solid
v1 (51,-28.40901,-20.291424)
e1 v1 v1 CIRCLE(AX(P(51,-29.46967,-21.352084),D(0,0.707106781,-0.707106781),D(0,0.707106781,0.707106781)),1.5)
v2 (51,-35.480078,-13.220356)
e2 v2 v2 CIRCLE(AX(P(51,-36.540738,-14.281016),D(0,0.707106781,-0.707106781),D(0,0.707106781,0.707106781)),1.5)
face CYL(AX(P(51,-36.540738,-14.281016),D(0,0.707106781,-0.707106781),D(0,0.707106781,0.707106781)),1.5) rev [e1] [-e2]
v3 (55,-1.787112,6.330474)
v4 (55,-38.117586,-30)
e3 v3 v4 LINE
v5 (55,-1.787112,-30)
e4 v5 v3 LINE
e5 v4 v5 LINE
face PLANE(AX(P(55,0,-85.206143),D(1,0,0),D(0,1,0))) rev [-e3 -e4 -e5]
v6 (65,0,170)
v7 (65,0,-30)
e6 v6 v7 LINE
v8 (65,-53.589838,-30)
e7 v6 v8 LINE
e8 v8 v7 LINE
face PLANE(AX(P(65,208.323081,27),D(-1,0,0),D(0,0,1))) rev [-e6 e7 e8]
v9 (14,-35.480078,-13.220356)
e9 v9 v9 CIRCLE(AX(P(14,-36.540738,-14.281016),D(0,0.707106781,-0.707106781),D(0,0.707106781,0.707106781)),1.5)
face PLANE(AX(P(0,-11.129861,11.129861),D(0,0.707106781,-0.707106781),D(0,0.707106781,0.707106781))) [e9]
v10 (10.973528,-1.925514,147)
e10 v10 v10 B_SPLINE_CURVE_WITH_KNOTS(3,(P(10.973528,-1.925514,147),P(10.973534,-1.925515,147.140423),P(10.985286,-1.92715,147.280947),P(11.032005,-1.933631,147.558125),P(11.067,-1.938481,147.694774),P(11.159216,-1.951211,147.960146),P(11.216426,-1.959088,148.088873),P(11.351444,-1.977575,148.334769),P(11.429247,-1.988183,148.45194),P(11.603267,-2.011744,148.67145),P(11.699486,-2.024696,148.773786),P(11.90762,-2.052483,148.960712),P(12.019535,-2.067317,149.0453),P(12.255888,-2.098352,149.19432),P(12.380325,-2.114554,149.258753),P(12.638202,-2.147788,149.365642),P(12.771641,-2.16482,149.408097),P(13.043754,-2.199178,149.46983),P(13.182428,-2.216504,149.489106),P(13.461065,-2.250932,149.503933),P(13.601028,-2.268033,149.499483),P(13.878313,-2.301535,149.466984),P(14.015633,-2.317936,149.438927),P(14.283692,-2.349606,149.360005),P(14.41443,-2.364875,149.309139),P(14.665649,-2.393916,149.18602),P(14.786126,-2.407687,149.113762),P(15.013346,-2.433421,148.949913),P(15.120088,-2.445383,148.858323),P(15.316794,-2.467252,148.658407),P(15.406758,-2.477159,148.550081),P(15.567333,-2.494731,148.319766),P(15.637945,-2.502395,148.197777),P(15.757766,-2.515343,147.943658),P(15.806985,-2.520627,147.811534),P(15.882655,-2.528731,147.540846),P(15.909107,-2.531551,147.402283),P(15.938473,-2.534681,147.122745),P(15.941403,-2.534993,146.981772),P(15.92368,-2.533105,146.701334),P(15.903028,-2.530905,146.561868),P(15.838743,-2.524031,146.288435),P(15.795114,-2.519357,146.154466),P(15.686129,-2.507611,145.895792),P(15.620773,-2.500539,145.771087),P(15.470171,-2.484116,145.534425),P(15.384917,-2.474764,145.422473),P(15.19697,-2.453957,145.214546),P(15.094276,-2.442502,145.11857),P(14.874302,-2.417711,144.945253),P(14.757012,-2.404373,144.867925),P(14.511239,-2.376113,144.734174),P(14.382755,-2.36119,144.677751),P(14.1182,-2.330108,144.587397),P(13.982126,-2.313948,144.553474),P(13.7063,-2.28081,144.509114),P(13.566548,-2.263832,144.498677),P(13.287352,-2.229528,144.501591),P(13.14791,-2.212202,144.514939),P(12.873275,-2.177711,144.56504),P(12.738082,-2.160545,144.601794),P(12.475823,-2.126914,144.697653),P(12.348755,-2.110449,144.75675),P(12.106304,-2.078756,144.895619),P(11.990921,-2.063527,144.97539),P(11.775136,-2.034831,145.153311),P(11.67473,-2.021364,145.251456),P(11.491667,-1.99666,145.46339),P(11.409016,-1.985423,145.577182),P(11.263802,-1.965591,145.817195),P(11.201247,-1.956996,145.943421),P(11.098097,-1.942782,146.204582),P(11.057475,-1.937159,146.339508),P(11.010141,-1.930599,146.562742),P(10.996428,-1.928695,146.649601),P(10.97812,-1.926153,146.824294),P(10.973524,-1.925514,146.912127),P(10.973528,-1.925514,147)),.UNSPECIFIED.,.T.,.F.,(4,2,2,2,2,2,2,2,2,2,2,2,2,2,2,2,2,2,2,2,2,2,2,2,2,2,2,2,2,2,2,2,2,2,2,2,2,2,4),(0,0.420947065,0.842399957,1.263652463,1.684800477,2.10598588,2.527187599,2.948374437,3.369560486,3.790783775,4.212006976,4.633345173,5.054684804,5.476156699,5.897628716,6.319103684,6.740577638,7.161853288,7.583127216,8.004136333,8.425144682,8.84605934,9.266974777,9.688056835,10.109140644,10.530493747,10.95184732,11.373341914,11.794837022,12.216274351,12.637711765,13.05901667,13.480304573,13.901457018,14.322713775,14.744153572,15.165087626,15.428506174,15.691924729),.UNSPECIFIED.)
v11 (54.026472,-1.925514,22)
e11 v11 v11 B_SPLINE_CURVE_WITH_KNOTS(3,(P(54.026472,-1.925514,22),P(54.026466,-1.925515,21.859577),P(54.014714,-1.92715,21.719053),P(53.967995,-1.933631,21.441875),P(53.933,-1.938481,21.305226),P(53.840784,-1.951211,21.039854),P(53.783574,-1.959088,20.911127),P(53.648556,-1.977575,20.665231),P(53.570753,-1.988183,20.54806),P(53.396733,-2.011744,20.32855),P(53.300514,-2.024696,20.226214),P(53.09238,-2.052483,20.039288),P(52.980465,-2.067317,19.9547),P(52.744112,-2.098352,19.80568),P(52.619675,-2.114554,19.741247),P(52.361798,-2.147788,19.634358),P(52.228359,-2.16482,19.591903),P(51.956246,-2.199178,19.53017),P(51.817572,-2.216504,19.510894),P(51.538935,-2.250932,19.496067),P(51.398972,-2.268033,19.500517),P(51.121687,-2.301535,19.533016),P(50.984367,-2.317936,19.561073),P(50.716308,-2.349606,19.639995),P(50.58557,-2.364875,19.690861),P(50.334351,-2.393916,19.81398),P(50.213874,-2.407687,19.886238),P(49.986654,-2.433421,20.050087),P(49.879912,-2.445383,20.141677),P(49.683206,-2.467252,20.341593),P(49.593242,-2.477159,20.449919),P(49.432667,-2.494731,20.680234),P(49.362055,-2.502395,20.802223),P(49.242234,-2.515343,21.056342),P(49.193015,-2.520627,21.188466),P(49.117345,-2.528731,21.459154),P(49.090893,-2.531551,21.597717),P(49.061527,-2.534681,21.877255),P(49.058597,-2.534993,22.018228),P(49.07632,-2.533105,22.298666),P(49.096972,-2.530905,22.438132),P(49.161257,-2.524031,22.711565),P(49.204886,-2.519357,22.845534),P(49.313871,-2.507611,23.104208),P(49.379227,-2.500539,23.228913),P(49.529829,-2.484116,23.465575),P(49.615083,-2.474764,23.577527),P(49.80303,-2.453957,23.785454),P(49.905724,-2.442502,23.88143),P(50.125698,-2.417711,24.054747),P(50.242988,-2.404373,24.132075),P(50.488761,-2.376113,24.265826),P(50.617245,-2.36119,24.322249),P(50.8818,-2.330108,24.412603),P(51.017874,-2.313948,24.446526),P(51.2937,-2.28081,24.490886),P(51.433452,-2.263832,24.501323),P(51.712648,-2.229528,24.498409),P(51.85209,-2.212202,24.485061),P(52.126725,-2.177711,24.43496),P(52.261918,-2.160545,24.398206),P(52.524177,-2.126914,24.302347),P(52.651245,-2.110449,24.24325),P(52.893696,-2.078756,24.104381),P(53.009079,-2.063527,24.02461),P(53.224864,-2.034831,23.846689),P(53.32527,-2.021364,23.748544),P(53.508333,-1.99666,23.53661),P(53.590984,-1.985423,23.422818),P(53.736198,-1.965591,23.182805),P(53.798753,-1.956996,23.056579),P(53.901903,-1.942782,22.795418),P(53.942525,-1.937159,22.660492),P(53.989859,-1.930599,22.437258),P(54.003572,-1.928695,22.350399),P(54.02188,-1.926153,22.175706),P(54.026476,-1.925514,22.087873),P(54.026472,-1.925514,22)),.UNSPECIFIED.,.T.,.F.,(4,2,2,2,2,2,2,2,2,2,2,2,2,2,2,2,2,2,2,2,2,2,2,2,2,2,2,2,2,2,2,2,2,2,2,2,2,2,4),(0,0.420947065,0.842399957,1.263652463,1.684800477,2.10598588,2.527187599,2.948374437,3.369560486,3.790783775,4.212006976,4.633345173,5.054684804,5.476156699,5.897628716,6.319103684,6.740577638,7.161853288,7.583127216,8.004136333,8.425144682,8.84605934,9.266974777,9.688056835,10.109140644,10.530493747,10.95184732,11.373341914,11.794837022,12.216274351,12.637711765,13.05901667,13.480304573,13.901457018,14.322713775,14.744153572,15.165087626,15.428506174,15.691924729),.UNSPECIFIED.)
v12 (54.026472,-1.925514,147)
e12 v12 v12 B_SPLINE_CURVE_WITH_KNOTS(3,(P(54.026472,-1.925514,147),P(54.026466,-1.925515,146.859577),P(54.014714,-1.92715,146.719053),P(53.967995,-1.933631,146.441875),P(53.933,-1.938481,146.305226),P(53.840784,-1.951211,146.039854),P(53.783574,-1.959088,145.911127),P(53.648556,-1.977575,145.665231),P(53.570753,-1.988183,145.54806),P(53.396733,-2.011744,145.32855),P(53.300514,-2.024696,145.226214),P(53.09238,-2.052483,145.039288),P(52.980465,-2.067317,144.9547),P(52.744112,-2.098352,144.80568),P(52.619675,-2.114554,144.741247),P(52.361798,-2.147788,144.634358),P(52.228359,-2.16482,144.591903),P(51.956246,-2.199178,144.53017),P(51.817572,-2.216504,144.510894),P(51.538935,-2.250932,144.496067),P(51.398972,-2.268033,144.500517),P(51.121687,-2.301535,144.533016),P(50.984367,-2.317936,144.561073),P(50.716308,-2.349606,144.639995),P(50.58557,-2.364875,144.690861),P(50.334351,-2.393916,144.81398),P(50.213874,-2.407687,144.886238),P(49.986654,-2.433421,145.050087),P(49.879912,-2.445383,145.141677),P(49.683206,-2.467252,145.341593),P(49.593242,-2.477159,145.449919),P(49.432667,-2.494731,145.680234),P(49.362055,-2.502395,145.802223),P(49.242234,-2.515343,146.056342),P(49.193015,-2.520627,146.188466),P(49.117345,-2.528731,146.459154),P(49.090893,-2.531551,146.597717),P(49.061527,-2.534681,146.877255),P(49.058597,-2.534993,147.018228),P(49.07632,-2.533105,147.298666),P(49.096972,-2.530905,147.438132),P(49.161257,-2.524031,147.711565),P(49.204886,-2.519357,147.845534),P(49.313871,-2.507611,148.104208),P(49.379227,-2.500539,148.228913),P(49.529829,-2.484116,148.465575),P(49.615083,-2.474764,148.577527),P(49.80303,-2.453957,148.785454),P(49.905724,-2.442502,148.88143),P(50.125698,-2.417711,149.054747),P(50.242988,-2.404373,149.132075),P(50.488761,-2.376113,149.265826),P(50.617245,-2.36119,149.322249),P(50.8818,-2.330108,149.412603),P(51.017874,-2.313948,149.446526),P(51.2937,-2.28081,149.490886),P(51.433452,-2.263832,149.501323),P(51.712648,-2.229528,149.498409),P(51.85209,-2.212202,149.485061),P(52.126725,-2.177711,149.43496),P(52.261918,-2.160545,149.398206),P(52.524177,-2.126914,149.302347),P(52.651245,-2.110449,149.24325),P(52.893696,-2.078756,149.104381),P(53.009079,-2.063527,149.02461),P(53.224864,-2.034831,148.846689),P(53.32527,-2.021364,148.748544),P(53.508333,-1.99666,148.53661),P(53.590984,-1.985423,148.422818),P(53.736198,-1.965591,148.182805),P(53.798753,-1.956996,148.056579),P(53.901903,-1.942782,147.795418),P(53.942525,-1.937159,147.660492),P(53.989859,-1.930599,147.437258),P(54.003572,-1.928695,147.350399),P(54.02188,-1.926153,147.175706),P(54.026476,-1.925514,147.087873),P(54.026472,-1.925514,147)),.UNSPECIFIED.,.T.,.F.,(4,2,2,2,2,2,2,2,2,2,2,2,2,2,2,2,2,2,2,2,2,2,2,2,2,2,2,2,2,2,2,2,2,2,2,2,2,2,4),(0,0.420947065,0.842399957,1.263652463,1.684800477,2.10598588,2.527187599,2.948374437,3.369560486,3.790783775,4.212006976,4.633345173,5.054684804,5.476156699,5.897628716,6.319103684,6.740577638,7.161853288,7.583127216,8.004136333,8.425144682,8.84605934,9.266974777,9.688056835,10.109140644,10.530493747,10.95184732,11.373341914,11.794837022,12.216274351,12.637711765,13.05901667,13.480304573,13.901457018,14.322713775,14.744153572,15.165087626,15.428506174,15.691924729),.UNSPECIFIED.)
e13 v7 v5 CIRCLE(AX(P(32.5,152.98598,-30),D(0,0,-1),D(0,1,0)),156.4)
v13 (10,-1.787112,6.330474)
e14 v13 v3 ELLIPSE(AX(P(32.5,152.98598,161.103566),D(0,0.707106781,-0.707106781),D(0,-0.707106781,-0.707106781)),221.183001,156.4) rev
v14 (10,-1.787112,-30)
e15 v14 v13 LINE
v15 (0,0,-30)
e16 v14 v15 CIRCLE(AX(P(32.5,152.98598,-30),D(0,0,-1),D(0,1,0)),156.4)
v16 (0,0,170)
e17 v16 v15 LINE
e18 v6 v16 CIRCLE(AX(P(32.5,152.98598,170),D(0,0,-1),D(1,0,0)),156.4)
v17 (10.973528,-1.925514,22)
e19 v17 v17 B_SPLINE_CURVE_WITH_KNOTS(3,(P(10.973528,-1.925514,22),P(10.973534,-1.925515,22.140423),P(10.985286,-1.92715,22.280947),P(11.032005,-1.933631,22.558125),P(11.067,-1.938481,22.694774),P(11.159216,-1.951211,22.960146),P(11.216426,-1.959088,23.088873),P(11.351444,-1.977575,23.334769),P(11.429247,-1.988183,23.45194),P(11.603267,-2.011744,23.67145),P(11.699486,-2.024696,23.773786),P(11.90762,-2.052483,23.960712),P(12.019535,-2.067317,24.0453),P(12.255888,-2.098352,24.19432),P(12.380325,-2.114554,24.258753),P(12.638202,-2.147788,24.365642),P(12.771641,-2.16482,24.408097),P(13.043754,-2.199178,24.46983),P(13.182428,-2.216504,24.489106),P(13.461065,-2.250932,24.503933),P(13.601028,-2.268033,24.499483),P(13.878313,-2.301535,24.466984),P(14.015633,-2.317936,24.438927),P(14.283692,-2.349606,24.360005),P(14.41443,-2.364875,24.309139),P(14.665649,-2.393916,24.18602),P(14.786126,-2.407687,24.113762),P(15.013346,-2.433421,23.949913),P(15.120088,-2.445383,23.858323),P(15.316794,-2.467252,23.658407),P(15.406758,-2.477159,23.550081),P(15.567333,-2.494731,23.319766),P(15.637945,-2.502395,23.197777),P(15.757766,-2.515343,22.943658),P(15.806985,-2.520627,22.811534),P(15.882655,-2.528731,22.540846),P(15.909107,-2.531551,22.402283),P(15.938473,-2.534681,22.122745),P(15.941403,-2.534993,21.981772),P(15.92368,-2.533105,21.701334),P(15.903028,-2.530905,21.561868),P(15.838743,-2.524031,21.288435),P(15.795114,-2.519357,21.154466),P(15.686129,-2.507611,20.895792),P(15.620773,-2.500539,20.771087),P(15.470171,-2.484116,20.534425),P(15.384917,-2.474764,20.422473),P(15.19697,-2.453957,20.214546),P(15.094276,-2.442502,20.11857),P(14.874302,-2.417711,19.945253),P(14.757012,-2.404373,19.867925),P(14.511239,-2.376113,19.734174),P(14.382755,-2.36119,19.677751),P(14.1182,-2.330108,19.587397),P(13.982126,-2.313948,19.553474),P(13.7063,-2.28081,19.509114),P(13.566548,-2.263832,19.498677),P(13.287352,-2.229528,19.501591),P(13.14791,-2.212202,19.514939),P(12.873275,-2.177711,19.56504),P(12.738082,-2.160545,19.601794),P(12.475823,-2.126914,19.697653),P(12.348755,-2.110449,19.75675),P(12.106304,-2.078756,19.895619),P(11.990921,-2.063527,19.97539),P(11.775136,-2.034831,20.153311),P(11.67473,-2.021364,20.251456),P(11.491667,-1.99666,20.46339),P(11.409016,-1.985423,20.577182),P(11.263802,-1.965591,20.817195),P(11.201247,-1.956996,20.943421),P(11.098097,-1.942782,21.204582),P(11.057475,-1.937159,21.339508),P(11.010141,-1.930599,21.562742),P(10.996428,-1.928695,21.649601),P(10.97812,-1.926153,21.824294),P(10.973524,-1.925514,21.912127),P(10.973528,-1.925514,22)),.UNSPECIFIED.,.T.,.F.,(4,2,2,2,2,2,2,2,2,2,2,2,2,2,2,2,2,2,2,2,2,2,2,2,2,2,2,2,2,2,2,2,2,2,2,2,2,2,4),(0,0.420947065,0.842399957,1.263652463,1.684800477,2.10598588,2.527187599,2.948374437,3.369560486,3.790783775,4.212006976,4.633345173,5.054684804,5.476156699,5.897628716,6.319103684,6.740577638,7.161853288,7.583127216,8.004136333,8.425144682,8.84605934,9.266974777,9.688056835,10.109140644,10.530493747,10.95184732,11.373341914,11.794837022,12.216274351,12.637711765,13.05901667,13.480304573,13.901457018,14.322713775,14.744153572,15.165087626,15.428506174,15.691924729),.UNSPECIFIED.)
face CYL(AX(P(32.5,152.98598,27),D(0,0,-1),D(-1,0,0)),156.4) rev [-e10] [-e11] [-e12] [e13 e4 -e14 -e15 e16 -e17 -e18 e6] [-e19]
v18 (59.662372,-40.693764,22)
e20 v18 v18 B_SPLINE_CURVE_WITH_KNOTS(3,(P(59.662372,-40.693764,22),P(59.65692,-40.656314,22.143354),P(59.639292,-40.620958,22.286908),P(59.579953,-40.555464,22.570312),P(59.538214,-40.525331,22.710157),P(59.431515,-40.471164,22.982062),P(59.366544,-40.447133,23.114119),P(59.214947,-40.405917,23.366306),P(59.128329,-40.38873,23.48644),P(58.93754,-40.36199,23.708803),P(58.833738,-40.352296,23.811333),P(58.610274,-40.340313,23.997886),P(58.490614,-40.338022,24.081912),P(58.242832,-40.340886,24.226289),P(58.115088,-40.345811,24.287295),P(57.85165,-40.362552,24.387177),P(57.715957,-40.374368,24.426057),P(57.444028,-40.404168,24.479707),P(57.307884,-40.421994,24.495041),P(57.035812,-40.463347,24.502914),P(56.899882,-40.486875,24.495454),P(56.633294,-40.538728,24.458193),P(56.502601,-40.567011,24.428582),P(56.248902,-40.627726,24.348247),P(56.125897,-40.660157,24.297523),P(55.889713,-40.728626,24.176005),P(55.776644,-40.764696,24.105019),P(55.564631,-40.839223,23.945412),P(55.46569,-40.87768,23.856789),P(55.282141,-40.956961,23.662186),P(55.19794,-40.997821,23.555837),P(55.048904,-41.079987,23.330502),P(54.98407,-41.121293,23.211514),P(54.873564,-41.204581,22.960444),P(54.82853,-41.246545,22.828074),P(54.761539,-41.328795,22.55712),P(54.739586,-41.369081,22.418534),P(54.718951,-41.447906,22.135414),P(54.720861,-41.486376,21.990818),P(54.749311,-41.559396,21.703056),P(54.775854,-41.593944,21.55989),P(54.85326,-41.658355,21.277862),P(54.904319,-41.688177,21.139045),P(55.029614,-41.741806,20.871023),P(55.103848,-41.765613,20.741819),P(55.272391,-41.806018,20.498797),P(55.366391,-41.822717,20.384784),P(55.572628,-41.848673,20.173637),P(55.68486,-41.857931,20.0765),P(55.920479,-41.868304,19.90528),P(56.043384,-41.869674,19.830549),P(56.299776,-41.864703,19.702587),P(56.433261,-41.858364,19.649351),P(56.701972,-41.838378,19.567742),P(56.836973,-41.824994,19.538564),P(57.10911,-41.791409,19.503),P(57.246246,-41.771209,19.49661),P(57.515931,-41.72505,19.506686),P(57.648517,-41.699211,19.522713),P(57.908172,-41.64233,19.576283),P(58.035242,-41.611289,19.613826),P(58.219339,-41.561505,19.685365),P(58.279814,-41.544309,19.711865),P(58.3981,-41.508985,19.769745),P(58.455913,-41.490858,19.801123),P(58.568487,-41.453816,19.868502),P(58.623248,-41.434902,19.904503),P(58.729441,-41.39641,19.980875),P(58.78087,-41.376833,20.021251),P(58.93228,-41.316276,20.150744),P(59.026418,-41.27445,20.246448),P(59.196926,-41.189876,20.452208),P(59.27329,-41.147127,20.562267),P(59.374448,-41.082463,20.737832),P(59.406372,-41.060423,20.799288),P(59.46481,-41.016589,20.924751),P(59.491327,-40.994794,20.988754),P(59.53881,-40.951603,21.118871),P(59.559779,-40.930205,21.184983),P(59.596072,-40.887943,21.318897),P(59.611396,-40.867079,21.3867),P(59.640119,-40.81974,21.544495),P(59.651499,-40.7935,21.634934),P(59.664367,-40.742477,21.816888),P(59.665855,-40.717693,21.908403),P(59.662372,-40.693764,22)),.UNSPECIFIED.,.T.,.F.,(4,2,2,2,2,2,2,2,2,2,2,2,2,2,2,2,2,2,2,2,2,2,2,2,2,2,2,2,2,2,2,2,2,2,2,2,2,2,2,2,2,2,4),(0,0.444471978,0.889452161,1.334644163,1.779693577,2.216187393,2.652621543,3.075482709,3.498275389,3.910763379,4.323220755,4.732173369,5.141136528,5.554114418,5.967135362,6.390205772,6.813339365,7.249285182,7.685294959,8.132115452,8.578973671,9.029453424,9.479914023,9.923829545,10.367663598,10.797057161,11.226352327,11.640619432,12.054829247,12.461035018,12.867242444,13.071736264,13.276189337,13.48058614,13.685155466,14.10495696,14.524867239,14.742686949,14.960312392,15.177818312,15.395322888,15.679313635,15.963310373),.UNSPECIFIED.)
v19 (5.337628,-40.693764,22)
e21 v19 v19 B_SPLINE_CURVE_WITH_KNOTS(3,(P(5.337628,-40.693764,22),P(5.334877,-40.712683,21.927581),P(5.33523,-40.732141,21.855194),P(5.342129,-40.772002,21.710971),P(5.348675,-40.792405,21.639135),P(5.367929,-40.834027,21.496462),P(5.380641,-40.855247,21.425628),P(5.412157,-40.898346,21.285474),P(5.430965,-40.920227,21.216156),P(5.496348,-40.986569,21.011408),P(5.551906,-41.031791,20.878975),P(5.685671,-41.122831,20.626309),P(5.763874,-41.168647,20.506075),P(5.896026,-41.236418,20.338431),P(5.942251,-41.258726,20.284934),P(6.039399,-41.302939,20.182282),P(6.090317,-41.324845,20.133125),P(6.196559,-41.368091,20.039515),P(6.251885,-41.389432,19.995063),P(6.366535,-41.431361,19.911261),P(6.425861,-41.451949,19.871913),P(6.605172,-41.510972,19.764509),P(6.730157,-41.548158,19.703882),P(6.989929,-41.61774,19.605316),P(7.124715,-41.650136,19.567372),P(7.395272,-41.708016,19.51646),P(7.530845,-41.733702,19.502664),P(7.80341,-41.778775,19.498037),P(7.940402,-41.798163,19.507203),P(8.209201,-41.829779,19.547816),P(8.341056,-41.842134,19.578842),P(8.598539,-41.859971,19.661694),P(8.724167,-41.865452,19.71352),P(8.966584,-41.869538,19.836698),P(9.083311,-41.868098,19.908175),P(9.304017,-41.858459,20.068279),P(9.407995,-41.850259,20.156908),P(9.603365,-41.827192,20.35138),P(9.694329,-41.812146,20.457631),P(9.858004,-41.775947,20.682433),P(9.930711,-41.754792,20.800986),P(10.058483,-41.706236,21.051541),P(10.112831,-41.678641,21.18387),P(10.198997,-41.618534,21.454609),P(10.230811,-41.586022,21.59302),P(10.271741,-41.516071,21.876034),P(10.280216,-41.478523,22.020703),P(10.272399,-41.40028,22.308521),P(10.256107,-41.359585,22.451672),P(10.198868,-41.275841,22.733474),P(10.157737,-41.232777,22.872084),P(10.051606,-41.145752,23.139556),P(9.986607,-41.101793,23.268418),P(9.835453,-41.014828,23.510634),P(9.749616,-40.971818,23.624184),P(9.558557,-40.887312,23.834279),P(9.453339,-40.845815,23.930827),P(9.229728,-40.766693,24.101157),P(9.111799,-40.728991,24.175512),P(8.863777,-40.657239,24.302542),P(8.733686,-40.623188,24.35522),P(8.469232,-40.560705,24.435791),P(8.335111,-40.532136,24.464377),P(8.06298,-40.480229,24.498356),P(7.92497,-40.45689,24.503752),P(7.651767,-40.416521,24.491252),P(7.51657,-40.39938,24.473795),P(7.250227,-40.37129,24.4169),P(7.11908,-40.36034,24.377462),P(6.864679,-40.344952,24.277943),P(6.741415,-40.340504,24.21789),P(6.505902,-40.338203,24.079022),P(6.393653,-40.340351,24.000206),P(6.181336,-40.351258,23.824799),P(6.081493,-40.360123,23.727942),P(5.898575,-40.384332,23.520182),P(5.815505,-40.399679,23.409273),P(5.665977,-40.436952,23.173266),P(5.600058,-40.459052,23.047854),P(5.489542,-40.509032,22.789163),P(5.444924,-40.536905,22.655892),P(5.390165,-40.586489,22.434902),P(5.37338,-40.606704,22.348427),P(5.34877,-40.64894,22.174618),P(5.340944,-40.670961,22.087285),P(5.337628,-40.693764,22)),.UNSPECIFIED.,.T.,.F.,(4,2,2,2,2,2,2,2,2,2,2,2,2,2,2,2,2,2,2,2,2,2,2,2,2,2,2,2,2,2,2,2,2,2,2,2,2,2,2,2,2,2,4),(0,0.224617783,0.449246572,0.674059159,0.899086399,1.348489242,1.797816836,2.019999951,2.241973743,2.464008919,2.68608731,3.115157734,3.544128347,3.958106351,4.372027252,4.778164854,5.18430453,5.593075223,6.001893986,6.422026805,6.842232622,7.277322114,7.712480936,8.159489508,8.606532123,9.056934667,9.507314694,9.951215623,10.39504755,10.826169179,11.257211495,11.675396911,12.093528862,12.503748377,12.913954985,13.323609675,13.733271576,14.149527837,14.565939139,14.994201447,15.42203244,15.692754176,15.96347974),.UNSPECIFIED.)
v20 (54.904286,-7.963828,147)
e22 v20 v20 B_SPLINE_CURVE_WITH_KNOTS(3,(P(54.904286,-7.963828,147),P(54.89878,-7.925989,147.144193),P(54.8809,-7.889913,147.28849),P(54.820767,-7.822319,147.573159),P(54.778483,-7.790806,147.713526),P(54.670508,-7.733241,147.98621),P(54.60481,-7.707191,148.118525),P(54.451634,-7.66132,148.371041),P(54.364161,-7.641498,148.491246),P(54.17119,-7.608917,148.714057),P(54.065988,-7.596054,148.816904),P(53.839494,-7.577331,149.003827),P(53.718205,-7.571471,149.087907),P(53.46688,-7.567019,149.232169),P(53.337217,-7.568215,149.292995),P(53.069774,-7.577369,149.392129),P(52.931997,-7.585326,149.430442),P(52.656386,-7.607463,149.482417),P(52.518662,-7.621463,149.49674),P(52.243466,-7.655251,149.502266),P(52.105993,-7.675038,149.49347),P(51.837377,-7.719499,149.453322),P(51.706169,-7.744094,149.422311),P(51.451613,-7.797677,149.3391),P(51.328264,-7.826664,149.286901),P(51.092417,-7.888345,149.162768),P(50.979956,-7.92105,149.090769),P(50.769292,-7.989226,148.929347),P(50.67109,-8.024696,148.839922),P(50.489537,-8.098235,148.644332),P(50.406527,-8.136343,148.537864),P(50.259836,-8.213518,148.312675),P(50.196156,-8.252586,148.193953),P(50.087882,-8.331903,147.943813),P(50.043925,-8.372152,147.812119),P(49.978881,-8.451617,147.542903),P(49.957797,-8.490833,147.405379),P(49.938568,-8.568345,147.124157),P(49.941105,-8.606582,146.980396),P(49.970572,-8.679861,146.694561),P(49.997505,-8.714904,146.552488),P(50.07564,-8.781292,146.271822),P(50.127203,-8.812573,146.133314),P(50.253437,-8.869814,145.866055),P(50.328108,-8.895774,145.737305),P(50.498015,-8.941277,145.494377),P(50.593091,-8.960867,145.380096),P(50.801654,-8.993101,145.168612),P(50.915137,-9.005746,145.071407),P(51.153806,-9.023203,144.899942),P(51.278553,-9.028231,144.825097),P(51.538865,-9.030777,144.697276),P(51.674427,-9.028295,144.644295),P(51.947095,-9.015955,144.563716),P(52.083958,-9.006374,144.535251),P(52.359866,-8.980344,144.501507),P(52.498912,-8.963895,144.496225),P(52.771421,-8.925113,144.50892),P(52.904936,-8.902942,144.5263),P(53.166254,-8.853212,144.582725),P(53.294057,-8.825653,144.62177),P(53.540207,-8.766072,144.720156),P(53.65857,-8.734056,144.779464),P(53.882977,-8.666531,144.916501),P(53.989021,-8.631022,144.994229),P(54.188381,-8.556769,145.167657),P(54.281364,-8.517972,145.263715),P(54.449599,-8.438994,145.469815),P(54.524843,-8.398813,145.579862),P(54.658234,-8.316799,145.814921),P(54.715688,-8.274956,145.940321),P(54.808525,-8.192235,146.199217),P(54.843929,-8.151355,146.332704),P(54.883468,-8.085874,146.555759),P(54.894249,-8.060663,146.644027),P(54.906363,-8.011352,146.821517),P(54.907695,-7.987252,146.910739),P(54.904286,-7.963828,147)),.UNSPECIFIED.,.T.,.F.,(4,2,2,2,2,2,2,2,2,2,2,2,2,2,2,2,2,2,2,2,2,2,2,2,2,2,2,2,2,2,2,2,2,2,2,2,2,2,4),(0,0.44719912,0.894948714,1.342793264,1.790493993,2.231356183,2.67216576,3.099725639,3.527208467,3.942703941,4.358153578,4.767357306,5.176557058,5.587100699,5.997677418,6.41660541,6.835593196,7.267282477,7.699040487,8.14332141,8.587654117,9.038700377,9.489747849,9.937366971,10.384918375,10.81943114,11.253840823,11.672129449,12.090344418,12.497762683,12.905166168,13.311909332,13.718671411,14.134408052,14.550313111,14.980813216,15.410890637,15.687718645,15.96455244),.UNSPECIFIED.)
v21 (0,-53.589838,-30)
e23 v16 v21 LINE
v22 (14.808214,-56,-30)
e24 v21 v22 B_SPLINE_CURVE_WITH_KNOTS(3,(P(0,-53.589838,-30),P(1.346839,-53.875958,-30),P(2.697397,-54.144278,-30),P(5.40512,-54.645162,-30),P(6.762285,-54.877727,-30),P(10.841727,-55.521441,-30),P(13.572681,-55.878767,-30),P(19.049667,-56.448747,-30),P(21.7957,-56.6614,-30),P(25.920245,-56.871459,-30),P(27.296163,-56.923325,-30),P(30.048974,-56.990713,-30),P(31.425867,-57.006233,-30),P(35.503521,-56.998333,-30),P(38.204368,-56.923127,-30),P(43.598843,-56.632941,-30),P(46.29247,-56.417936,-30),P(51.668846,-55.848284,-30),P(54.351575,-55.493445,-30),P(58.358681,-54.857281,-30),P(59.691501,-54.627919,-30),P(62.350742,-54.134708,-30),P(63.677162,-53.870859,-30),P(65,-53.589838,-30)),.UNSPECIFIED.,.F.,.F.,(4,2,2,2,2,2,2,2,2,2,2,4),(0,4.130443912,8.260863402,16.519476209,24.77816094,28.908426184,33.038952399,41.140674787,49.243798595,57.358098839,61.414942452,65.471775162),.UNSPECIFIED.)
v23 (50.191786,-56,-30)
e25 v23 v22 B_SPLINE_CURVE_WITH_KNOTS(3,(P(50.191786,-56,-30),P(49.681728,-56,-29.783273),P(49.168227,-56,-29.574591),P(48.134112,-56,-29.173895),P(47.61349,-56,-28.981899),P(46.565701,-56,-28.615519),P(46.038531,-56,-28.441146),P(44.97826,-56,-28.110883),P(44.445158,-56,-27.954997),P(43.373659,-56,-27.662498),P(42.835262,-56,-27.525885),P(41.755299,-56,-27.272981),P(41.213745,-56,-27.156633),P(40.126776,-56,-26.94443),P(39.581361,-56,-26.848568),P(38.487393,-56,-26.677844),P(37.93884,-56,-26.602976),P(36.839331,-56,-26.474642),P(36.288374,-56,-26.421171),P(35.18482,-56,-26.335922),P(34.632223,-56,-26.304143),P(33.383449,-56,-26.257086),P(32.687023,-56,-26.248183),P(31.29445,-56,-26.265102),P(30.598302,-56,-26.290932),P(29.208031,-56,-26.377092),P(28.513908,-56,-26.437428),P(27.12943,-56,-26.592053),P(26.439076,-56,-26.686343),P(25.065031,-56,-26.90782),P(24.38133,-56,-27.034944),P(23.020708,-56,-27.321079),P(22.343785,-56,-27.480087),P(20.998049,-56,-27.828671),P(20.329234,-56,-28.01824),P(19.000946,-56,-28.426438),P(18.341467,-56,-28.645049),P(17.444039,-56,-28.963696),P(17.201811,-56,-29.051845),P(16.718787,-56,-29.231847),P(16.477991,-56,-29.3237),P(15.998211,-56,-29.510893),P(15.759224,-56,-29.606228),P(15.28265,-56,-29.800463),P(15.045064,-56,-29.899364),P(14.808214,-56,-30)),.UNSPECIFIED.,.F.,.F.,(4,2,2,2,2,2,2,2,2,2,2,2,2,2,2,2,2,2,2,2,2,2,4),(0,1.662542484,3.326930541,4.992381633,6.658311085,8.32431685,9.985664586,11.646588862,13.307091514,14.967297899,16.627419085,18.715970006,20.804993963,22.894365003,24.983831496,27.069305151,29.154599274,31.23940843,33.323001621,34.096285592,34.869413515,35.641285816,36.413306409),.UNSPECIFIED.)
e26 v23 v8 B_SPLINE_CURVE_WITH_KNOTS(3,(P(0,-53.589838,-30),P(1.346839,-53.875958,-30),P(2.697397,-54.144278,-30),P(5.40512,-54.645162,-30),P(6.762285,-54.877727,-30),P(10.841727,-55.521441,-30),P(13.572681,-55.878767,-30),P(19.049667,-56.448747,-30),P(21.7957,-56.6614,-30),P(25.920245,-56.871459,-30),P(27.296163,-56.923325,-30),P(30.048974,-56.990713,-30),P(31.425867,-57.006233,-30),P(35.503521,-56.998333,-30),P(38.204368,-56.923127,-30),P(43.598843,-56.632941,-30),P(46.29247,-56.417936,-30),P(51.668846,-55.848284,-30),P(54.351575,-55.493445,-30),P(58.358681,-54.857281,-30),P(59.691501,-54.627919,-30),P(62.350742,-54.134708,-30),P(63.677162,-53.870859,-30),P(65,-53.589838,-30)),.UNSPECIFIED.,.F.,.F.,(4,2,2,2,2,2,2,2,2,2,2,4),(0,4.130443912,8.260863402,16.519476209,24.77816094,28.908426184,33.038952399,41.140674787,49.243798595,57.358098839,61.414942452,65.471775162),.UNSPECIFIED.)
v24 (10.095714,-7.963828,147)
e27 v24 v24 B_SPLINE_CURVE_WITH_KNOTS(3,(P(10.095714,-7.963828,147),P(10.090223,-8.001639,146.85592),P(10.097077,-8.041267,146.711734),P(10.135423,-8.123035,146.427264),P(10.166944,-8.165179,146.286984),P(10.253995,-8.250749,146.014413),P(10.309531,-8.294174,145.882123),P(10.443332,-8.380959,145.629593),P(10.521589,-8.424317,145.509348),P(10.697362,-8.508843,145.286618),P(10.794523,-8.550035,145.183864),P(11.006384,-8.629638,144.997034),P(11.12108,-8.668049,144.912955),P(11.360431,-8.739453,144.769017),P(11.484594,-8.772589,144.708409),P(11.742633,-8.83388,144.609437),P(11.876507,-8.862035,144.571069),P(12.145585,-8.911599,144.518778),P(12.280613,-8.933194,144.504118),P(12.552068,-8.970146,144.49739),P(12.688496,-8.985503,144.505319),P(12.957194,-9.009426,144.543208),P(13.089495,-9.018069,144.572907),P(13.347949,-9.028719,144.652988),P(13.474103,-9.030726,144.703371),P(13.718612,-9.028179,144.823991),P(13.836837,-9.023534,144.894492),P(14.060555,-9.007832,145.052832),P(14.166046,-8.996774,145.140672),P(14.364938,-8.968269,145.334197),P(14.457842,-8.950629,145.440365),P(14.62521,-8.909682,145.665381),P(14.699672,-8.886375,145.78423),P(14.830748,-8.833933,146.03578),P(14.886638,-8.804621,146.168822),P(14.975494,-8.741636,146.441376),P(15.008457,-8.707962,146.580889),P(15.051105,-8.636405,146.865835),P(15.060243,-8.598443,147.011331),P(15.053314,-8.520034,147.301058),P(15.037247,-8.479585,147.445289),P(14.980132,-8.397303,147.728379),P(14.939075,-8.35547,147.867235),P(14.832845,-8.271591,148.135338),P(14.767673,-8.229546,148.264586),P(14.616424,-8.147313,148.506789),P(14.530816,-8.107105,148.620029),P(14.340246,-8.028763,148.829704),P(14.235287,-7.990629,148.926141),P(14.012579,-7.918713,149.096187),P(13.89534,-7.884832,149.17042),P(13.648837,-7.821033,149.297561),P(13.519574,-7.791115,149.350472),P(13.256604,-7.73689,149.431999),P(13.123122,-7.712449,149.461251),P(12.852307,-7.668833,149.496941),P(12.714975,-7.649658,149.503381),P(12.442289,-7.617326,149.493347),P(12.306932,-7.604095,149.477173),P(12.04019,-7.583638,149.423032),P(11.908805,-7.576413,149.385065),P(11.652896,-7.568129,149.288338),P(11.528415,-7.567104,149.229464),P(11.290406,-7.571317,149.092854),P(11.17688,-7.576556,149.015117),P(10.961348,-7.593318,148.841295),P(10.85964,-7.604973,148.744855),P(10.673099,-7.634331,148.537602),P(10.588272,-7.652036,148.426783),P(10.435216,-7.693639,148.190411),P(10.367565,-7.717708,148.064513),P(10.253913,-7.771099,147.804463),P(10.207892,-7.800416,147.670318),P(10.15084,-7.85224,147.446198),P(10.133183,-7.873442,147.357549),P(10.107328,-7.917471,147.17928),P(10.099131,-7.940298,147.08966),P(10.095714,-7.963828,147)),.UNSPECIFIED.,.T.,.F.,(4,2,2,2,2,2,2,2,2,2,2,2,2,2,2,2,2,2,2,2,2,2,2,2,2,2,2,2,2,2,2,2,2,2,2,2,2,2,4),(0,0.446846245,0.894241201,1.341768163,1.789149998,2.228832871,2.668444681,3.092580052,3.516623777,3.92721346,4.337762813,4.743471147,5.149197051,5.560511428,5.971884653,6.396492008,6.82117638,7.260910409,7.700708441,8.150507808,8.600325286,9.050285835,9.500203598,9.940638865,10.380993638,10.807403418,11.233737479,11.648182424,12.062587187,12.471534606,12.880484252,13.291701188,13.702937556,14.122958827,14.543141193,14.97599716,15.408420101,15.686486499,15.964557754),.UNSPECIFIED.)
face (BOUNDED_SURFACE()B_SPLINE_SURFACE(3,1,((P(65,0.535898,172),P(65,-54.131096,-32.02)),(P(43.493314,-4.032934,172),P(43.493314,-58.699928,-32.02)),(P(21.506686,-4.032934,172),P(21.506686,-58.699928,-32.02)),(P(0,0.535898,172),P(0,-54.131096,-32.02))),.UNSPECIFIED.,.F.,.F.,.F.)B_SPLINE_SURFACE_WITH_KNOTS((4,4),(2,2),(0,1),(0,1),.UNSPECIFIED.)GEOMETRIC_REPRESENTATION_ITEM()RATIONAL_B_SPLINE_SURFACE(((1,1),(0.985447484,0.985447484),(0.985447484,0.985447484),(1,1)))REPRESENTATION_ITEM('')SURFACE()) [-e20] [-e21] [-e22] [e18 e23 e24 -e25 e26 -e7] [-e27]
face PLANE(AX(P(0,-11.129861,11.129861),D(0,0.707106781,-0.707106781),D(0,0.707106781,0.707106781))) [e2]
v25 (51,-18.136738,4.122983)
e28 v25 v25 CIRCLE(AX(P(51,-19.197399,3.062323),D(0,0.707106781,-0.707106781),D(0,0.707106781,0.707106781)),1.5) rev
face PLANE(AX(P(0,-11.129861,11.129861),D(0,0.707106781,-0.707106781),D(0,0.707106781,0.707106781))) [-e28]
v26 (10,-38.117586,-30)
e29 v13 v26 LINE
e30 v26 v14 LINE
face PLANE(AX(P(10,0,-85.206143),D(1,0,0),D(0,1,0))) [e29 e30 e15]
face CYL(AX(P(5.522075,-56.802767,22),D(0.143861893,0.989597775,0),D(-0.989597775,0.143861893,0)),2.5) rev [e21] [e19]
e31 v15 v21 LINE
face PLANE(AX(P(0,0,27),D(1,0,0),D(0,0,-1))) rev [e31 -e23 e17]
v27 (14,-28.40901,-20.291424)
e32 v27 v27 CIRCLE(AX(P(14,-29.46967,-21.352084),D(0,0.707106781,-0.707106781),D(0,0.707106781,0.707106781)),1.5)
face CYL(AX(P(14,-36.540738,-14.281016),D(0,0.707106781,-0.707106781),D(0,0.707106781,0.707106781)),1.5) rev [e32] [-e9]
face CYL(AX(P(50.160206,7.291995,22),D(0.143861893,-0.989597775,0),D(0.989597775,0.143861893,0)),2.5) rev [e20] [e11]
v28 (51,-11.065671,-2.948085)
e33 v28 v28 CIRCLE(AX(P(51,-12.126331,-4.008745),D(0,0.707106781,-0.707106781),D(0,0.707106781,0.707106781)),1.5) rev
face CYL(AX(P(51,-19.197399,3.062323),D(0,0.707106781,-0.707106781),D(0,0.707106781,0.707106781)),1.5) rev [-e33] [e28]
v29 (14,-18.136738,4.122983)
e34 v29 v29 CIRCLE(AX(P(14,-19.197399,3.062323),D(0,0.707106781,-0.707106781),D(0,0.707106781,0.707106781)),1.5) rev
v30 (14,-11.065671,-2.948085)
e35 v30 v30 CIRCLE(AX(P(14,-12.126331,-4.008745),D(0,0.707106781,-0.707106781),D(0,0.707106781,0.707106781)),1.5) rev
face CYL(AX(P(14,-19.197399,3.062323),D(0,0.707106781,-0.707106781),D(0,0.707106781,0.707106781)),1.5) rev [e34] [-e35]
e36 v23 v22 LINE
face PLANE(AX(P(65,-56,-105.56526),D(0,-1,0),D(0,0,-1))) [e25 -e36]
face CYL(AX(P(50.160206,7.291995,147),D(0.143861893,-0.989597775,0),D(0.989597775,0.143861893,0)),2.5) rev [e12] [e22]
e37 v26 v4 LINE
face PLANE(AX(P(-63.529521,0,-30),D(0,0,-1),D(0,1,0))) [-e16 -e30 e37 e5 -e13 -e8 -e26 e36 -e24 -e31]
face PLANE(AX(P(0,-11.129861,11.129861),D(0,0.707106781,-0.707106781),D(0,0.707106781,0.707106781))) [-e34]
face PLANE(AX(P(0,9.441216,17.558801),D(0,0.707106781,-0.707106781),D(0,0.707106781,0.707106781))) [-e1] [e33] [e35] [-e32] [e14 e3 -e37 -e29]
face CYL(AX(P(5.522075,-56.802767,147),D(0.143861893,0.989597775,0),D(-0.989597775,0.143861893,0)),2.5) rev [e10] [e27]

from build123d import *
from build123d.topology import SkipClean

# Parameters (mm, degrees)
BOSS_EXTRUDE1_DEPTH     = 27
BOSS_EXTRUDE2_DEPTH     = 65
CUT_EXTRUDE1_DEPTH      = 91.890043459
FILLET1_R               = 1
BOSS_EXTRUDE3_REACH     = 104.243
CUT_EXTRUDE2_REACH      = 104.243
BOSS_EXTRUDE4_REACH     = 92.026
BOSS_EXTRUDE5_DEPTH     = 65
SKETCH14_R              = 1.5
CUT_EXTRUDE7_DEPTH      = 5
CUT_EXTRUDE9_DEPTH      = 105.630301538
CUT_EXTRUDE9_DEPTH_BACK = 105.630301538
SKETCH15_W              = 45
SKETCH15_H              = 5.74
SKETCH16_R              = 1.5
CUT_EXTRUDE10_DEPTH     = 10
FILLET4_R               = 23
BOSS_EXTRUDE7_REACH     = 219.626
CUT_EXTRUDE5_DEPTH      = 184.620949427
CUT_EXTRUDE5_DEPTH_BACK = 184.620949427
SKETCH11_R              = 2.5
CUT_EXTRUDE6_DEPTH      = 186.847147779
CUT_EXTRUDE6_DEPTH_BACK = 186.847147779
SKETCH12_R              = 2.5
CUT_SWEEP1_START        = -43.471641414
CUT_SWEEP1_DEPTH        = 207.679031883


# Read off the part's stored shape, not the designer's step: Cut-Sweep1
with BuildPart() as part:
    # Sketch1 → Boss-Extrude1 (new body)
    with BuildSketch(Plane.XY):
        with BuildLine():
            Line((0, 0), (0, -26))
            ThreePointArc((0, -26), (32.5, -29.41402025), (65, -26))
            Line((65, -26), (65, 0))
            ThreePointArc((65, 0), (32.5, -3.41402025), (0, 0))
        make_face()
    extrude(amount=BOSS_EXTRUDE1_DEPTH)

    # Sketch4 → Boss-Extrude2 (add)
    with BuildSketch(Plane(origin=(65, 0, 0), x_dir=(0, 0, -1), z_dir=(1, 0, 0))):
        Polygon((0, -26), (30, -56), (30, -30), (0, 0), align=None)
    extrude(amount=-BOSS_EXTRUDE2_DEPTH)

    # Sketch5 → Cut-Extrude1 (cut, through all)
    with BuildSketch(Plane.XY):
        with BuildLine():
            Line((65, 0), (0, 0))
            ThreePointArc((0, 0), (32.5, -3.41402025), (65, 0))
        make_face()
    extrude(amount=-CUT_EXTRUDE1_DEPTH, mode=Mode.SUBTRACT)

    # Fillet1
    fillet1_edges = [part.edges().sort_by_distance(p)[0] for p in [
        (32.5, -56, -30),
    ]]
    fillet(fillet1_edges, radius=FILLET1_R)

    # Boss-Extrude3: up to this face of the body (flat: up to its plane)
    boss_extrude3_end = Plane(part.part.faces().sort_by_distance((32.5, -41.792893219, -30))[0])
    # Sketch6 → Boss-Extrude3 (add, up to the picked face)
    with BuildSketch(Plane.XY.offset(27), mode=Mode.PRIVATE) as boss_extrude3_sk1:
        with BuildLine():
            ThreePointArc((0, -26), (4.985486693, -26.974767058), (10, -27.787112227))
            Line((10, -27.787112227), (10, -1.787112227))
            ThreePointArc((10, -1.787112227), (4.985486693, -0.974767058), (0, 0))
            Line((0, 0), (0, -26))
        make_face()
    boss_extrude3_tool1 = split(extrude(boss_extrude3_sk1.sketch, amount=-BOSS_EXTRUDE3_REACH, mode=Mode.PRIVATE), bisect_by=boss_extrude3_end, keep=Keep.BOTH, mode=Mode.PRIVATE)
    # Sketch6 → Boss-Extrude3 (add, up to the picked face)
    with BuildSketch(Plane.XY.offset(27), mode=Mode.PRIVATE) as boss_extrude3_sk2:
        with BuildLine():
            Line((55, -1.787112227), (55, -27.787112227))
            ThreePointArc((55, -27.787112227), (60.014513307, -26.974767058), (65, -26))
            Line((65, -26), (65, 0))
            ThreePointArc((65, 0), (60.014513307, -0.974767058), (55, -1.787112227))
        make_face()
    boss_extrude3_tool2 = split(extrude(boss_extrude3_sk2.sketch, amount=-BOSS_EXTRUDE3_REACH, mode=Mode.PRIVATE), bisect_by=boss_extrude3_end, keep=Keep.BOTH, mode=Mode.PRIVATE)
    # Sketch6 → Boss-Extrude3 (add, up to the picked face)
    with BuildSketch(Plane.XY.offset(27), mode=Mode.PRIVATE) as boss_extrude3_sk3:
        with BuildLine():
            Line((10, -54.292893219), (10, -27.787112227))
            ThreePointArc((10, -27.787112227), (4.985486693, -26.974767058), (0, -26))
            Line((0, -26), (0, -54.292893219))
            Line((0, -54.292893219), (10, -54.292893219))
        make_face()
    boss_extrude3_tool3 = split(extrude(boss_extrude3_sk3.sketch, amount=-BOSS_EXTRUDE3_REACH, mode=Mode.PRIVATE), bisect_by=boss_extrude3_end, keep=Keep.BOTH, mode=Mode.PRIVATE)
    # Sketch6 → Boss-Extrude3 (add, up to the picked face)
    with BuildSketch(Plane.XY.offset(27), mode=Mode.PRIVATE) as boss_extrude3_sk4:
        with BuildLine():
            ThreePointArc((65, -26), (60.014513307, -26.974767058), (55, -27.787112227))
            Line((55, -27.787112227), (55, -54.292893219))
            Line((55, -54.292893219), (65, -54.292893219))
            Line((65, -54.292893219), (65, -26))
        make_face()
    boss_extrude3_tool4 = split(extrude(boss_extrude3_sk4.sketch, amount=-BOSS_EXTRUDE3_REACH, mode=Mode.PRIVATE), bisect_by=boss_extrude3_end, keep=Keep.BOTH, mode=Mode.PRIVATE)
    add(boss_extrude3_tool1.solids().sort_by(Axis((5, -13.949429, 27), (0, 0, -1)))[0])
    add(boss_extrude3_tool2.solids().sort_by(Axis((60, -13.949429, 27), (0, 0, -1)))[0])
    add(boss_extrude3_tool3.solids().sort_by(Axis((4.945547, -40.616285, 27), (0, 0, -1)))[0])
    add(boss_extrude3_tool4.solids().sort_by(Axis((60.054453, -40.616285, 27), (0, 0, -1)))[0])

    # Cut-Extrude2: up to this plane
    cut_extrude2_end = Plane(origin=(-63.529520697, -13, 13), z_dir=(0, -0.7071067811865562, 0.7071067811865389))
    # Sketch7 → Cut-Extrude2 (cut, up to the surface)
    with BuildSketch(Plane.XY.offset(27), mode=Mode.PRIVATE) as cut_extrude2_sk1:
        with BuildLine():
            ThreePointArc((10, -27.787112227), (4.985486693, -26.974767058), (0, -26))
            Line((0, -26), (0, -54.292893219))
            Line((0, -54.292893219), (10, -54.292893219))
            Line((10, -54.292893219), (10, -27.787112227))
        make_face()
    cut_extrude2_tool1 = split(extrude(cut_extrude2_sk1.sketch, amount=-CUT_EXTRUDE2_REACH, mode=Mode.PRIVATE), bisect_by=cut_extrude2_end, keep=Keep.BOTH, mode=Mode.PRIVATE)
    add(cut_extrude2_tool1.solids().sort_by_distance((4.945547, -40.616285, 27))[0], mode=Mode.SUBTRACT)
    # Sketch7 → Cut-Extrude2 (cut, up to the surface)
    with BuildSketch(Plane.XY.offset(27), mode=Mode.PRIVATE) as cut_extrude2_sk2:
        with BuildLine():
            Line((65, -54.292893219), (65, -26))
            ThreePointArc((65, -26), (60.014513307, -26.974767058), (55, -27.787112227))
            Line((55, -27.787112227), (55, -54.292893219))
            Line((55, -54.292893219), (65, -54.292893219))
        make_face()
    cut_extrude2_tool2 = split(extrude(cut_extrude2_sk2.sketch, amount=-CUT_EXTRUDE2_REACH, mode=Mode.PRIVATE), bisect_by=cut_extrude2_end, keep=Keep.BOTH, mode=Mode.PRIVATE)
    add(cut_extrude2_tool2.solids().sort_by_distance((60.054453, -40.616285, 27))[0], mode=Mode.SUBTRACT)

    # Boss-Extrude4: up to this face of the body (flat: up to its plane)
    boss_extrude4_end = Plane(part.part.faces().sort_by_distance((32.5, -40.28761869, -14.28761869))[0])
    # Sketch8 → Boss-Extrude4 (add, up to the picked face)
    with BuildSketch(Plane(origin=(0, 0, 0), x_dir=(-1, 0, 0), z_dir=(0, 0, -1)), mode=Mode.PRIVATE) as boss_extrude4_sk1:
        with BuildLine():
            Line((-55, -26), (-55, -27.787112227))
            ThreePointArc((-55, -27.787112227), (-32.5, -29.41402025), (-10, -27.787112227))
            Line((-10, -27.787112227), (-10, -26))
            Line((-10, -26), (-55, -26))
        make_face()
    boss_extrude4_tool1 = split(extrude(boss_extrude4_sk1.sketch, amount=BOSS_EXTRUDE4_REACH, mode=Mode.PRIVATE), bisect_by=boss_extrude4_end, keep=Keep.BOTH, mode=Mode.PRIVATE)
    add(boss_extrude4_tool1.solids().sort_by(Axis((32.5, -27.477312, 0), (0, 0, -1)))[0])

    # Sketch9 → Boss-Extrude5 (add)
    with BuildSketch(Plane.ZY):
        Polygon((-30, -51), (-25, -51), (-30, -56), align=None)
    extrude(amount=-BOSS_EXTRUDE5_DEPTH)

    # Sketch14 → Cut-Extrude7 (cut)
    with SkipClean():  # the faces are left unmerged after this step: merging them gives an invalid solid
        with BuildSketch(Plane(origin=(0, 0, 0), x_dir=(1, 0, 0), z_dir=(0, 0.7071067811865561, -0.7071067811865389))):
            with Locations(Location((14, 35.887280306, 0), (0, 0, 270))):
                Circle(SKETCH14_R)
            with Locations(Location((51, 35.887280306, 0), (0, 0, 270))):
                Circle(SKETCH14_R)
            with Locations(Location((51, 11.367280306, 0), (0, 0, 90))):
                Circle(SKETCH14_R)
            with Locations(Location((14, 11.367280306, 0), (0, 0, 90))):
                Circle(SKETCH14_R)
        extrude(amount=-CUT_EXTRUDE7_DEPTH, mode=Mode.SUBTRACT)

    # Sketch15 → Cut-Extrude9 (cut, two sides: drawn at the far end of the back side and taken through both)
    with SkipClean():  # the faces are left unmerged after this step: merging them gives an invalid solid
        with BuildSketch(Plane(origin=(0, 13.5, 13.5), x_dir=(-1, 0, 0), z_dir=(0, -0.7071067811865389, -0.7071067811865561)).offset(-CUT_EXTRUDE9_DEPTH_BACK)):
            with Locations((-32.5, -2.87)):
                Rectangle(SKETCH15_W, SKETCH15_H)
        extrude(amount=CUT_EXTRUDE9_DEPTH + CUT_EXTRUDE9_DEPTH_BACK, mode=Mode.SUBTRACT)

    # Sketch16 → Cut-Extrude10 (cut)
    with SkipClean():  # the faces are left unmerged after this step: merging them gives an invalid solid
        with BuildSketch(Plane(origin=(0, -4.058792924, 4.058792924), x_dir=(1, 0, 0), z_dir=(0, 0.7071067811865562, -0.7071067811865389))):
            with Locations(Location((14, 35.936406871, 0), (0, 0, 270))):
                Circle(SKETCH16_R)
            with Locations(Location((51, 35.936406871, 0), (0, 0, 270))):
                Circle(SKETCH16_R)
            with Locations(Location((14, 11.409221552, 0), (0, 0, 270))):
                Circle(SKETCH16_R)
            with Locations(Location((51, 11.409221552, 0), (0, 0, 270))):
                Circle(SKETCH16_R)
        extrude(amount=-CUT_EXTRUDE10_DEPTH, mode=Mode.SUBTRACT)

    # Fillet4
    fillet4_edges = [part.edges().sort_by_distance(p)[0] for p in [
        (32.5, -29.41402025, -3.41402025),
    ]]
    fillet(fillet4_edges, radius=FILLET4_R)

    # Boss-Extrude7: up to this face of the body (flat: up to its plane)
    boss_extrude7_end = Plane(part.part.faces().sort_by_distance((32.499999985, -45.563204914, -19.563204914))[0])
    # Sketch24 → Boss-Extrude7 (add, up to the picked face)
    with BuildSketch(Plane.XY.offset(170), mode=Mode.PRIVATE) as boss_extrude7_sk1:
        with BuildLine():
            Line((65, -56), (65, 0))
            ThreePointArc((65, 0), (60.014513307, -0.974767058), (55, -1.787112227))
            ThreePointArc((55, -1.787112227), (32.5, -3.41402025), (10, -1.787112227))
            ThreePointArc((10, -1.787112227), (4.985486693, -0.974767058), (0, 0))
            Line((0, 0), (0, -56))
            Line((0, -56), (65, -56))
        make_face()
    boss_extrude7_tool1 = split(extrude(boss_extrude7_sk1.sketch, amount=-BOSS_EXTRUDE7_REACH, mode=Mode.PRIVATE), bisect_by=boss_extrude7_end, keep=Keep.BOTH, mode=Mode.PRIVATE)
    add(boss_extrude7_tool1.solids().sort_by(Axis((32.5, -29.130902, 170), (0, 0, -1)))[0])

    # Sketch11 → Cut-Extrude5 (cut, two sides: drawn at the far end of the back side and taken through both)
    with BuildSketch(Plane(origin=(5.094217018, -35.042120851, 0), x_dir=(-0.9895977747865052, -0.14386189258312035, 0), z_dir=(-0.14386189258312035, 0.9895977747865053, 0)).offset(-CUT_EXTRUDE5_DEPTH_BACK)):
        with Locations(Location((-50.687468406, 22, 0), (0, 0, 180))):
            Circle(SKETCH11_R)
        with Locations(Location((-50.687468406, 147, 0), (0, 0, 180))):
            Circle(SKETCH11_R)
    extrude(amount=CUT_EXTRUDE5_DEPTH + CUT_EXTRUDE5_DEPTH_BACK, mode=Mode.SUBTRACT)

    # Sketch12 → Cut-Extrude6 (cut, two sides: drawn at the far end of the back side and taken through both)
    with BuildSketch(Plane(origin=(-3.74896115, -25.788369281, 0), x_dir=(0.9895977747865055, -0.14386189258311885, 0), z_dir=(-0.14386189258311885, -0.9895977747865056, 0)).offset(-CUT_EXTRUDE6_DEPTH_BACK)):
        with Locations(Location((13.636386955, 22, 0), (0, 0, 180))):
            Circle(SKETCH12_R)
        with Locations(Location((13.636386955, 147, 0), (0, 0, 180))):
            Circle(SKETCH12_R)
    extrude(amount=CUT_EXTRUDE6_DEPTH + CUT_EXTRUDE6_DEPTH_BACK, mode=Mode.SUBTRACT)

    # Cut-Sweep1 outline → Cut-Sweep1 (cut)
    with BuildSketch(Plane(origin=(0, 0, 0), x_dir=(1, 0, 0), z_dir=(0, 0.2588190451025179, 0.9659258262890691)).offset(CUT_SWEEP1_START)):
        with BuildLine():
            Line((65, -100), (65, -43.999237667))
            add(Edge.make_bspline(
                [(65, -43.999237667), (43.493313707, -48.412390901), (21.506686293, -48.412390901), (0, -43.999237667)],
                knots=[0, 0, 0, 0, 1, 1, 1, 1], degree=3, weights=[1, 0.985447484, 0.985447484, 1]))
            Line((0, -43.999237667), (0, -100))
            Line((0, -100), (65, -100))
        make_face()
    extrude(amount=CUT_SWEEP1_DEPTH, mode=Mode.SUBTRACT)


solid = part.part
